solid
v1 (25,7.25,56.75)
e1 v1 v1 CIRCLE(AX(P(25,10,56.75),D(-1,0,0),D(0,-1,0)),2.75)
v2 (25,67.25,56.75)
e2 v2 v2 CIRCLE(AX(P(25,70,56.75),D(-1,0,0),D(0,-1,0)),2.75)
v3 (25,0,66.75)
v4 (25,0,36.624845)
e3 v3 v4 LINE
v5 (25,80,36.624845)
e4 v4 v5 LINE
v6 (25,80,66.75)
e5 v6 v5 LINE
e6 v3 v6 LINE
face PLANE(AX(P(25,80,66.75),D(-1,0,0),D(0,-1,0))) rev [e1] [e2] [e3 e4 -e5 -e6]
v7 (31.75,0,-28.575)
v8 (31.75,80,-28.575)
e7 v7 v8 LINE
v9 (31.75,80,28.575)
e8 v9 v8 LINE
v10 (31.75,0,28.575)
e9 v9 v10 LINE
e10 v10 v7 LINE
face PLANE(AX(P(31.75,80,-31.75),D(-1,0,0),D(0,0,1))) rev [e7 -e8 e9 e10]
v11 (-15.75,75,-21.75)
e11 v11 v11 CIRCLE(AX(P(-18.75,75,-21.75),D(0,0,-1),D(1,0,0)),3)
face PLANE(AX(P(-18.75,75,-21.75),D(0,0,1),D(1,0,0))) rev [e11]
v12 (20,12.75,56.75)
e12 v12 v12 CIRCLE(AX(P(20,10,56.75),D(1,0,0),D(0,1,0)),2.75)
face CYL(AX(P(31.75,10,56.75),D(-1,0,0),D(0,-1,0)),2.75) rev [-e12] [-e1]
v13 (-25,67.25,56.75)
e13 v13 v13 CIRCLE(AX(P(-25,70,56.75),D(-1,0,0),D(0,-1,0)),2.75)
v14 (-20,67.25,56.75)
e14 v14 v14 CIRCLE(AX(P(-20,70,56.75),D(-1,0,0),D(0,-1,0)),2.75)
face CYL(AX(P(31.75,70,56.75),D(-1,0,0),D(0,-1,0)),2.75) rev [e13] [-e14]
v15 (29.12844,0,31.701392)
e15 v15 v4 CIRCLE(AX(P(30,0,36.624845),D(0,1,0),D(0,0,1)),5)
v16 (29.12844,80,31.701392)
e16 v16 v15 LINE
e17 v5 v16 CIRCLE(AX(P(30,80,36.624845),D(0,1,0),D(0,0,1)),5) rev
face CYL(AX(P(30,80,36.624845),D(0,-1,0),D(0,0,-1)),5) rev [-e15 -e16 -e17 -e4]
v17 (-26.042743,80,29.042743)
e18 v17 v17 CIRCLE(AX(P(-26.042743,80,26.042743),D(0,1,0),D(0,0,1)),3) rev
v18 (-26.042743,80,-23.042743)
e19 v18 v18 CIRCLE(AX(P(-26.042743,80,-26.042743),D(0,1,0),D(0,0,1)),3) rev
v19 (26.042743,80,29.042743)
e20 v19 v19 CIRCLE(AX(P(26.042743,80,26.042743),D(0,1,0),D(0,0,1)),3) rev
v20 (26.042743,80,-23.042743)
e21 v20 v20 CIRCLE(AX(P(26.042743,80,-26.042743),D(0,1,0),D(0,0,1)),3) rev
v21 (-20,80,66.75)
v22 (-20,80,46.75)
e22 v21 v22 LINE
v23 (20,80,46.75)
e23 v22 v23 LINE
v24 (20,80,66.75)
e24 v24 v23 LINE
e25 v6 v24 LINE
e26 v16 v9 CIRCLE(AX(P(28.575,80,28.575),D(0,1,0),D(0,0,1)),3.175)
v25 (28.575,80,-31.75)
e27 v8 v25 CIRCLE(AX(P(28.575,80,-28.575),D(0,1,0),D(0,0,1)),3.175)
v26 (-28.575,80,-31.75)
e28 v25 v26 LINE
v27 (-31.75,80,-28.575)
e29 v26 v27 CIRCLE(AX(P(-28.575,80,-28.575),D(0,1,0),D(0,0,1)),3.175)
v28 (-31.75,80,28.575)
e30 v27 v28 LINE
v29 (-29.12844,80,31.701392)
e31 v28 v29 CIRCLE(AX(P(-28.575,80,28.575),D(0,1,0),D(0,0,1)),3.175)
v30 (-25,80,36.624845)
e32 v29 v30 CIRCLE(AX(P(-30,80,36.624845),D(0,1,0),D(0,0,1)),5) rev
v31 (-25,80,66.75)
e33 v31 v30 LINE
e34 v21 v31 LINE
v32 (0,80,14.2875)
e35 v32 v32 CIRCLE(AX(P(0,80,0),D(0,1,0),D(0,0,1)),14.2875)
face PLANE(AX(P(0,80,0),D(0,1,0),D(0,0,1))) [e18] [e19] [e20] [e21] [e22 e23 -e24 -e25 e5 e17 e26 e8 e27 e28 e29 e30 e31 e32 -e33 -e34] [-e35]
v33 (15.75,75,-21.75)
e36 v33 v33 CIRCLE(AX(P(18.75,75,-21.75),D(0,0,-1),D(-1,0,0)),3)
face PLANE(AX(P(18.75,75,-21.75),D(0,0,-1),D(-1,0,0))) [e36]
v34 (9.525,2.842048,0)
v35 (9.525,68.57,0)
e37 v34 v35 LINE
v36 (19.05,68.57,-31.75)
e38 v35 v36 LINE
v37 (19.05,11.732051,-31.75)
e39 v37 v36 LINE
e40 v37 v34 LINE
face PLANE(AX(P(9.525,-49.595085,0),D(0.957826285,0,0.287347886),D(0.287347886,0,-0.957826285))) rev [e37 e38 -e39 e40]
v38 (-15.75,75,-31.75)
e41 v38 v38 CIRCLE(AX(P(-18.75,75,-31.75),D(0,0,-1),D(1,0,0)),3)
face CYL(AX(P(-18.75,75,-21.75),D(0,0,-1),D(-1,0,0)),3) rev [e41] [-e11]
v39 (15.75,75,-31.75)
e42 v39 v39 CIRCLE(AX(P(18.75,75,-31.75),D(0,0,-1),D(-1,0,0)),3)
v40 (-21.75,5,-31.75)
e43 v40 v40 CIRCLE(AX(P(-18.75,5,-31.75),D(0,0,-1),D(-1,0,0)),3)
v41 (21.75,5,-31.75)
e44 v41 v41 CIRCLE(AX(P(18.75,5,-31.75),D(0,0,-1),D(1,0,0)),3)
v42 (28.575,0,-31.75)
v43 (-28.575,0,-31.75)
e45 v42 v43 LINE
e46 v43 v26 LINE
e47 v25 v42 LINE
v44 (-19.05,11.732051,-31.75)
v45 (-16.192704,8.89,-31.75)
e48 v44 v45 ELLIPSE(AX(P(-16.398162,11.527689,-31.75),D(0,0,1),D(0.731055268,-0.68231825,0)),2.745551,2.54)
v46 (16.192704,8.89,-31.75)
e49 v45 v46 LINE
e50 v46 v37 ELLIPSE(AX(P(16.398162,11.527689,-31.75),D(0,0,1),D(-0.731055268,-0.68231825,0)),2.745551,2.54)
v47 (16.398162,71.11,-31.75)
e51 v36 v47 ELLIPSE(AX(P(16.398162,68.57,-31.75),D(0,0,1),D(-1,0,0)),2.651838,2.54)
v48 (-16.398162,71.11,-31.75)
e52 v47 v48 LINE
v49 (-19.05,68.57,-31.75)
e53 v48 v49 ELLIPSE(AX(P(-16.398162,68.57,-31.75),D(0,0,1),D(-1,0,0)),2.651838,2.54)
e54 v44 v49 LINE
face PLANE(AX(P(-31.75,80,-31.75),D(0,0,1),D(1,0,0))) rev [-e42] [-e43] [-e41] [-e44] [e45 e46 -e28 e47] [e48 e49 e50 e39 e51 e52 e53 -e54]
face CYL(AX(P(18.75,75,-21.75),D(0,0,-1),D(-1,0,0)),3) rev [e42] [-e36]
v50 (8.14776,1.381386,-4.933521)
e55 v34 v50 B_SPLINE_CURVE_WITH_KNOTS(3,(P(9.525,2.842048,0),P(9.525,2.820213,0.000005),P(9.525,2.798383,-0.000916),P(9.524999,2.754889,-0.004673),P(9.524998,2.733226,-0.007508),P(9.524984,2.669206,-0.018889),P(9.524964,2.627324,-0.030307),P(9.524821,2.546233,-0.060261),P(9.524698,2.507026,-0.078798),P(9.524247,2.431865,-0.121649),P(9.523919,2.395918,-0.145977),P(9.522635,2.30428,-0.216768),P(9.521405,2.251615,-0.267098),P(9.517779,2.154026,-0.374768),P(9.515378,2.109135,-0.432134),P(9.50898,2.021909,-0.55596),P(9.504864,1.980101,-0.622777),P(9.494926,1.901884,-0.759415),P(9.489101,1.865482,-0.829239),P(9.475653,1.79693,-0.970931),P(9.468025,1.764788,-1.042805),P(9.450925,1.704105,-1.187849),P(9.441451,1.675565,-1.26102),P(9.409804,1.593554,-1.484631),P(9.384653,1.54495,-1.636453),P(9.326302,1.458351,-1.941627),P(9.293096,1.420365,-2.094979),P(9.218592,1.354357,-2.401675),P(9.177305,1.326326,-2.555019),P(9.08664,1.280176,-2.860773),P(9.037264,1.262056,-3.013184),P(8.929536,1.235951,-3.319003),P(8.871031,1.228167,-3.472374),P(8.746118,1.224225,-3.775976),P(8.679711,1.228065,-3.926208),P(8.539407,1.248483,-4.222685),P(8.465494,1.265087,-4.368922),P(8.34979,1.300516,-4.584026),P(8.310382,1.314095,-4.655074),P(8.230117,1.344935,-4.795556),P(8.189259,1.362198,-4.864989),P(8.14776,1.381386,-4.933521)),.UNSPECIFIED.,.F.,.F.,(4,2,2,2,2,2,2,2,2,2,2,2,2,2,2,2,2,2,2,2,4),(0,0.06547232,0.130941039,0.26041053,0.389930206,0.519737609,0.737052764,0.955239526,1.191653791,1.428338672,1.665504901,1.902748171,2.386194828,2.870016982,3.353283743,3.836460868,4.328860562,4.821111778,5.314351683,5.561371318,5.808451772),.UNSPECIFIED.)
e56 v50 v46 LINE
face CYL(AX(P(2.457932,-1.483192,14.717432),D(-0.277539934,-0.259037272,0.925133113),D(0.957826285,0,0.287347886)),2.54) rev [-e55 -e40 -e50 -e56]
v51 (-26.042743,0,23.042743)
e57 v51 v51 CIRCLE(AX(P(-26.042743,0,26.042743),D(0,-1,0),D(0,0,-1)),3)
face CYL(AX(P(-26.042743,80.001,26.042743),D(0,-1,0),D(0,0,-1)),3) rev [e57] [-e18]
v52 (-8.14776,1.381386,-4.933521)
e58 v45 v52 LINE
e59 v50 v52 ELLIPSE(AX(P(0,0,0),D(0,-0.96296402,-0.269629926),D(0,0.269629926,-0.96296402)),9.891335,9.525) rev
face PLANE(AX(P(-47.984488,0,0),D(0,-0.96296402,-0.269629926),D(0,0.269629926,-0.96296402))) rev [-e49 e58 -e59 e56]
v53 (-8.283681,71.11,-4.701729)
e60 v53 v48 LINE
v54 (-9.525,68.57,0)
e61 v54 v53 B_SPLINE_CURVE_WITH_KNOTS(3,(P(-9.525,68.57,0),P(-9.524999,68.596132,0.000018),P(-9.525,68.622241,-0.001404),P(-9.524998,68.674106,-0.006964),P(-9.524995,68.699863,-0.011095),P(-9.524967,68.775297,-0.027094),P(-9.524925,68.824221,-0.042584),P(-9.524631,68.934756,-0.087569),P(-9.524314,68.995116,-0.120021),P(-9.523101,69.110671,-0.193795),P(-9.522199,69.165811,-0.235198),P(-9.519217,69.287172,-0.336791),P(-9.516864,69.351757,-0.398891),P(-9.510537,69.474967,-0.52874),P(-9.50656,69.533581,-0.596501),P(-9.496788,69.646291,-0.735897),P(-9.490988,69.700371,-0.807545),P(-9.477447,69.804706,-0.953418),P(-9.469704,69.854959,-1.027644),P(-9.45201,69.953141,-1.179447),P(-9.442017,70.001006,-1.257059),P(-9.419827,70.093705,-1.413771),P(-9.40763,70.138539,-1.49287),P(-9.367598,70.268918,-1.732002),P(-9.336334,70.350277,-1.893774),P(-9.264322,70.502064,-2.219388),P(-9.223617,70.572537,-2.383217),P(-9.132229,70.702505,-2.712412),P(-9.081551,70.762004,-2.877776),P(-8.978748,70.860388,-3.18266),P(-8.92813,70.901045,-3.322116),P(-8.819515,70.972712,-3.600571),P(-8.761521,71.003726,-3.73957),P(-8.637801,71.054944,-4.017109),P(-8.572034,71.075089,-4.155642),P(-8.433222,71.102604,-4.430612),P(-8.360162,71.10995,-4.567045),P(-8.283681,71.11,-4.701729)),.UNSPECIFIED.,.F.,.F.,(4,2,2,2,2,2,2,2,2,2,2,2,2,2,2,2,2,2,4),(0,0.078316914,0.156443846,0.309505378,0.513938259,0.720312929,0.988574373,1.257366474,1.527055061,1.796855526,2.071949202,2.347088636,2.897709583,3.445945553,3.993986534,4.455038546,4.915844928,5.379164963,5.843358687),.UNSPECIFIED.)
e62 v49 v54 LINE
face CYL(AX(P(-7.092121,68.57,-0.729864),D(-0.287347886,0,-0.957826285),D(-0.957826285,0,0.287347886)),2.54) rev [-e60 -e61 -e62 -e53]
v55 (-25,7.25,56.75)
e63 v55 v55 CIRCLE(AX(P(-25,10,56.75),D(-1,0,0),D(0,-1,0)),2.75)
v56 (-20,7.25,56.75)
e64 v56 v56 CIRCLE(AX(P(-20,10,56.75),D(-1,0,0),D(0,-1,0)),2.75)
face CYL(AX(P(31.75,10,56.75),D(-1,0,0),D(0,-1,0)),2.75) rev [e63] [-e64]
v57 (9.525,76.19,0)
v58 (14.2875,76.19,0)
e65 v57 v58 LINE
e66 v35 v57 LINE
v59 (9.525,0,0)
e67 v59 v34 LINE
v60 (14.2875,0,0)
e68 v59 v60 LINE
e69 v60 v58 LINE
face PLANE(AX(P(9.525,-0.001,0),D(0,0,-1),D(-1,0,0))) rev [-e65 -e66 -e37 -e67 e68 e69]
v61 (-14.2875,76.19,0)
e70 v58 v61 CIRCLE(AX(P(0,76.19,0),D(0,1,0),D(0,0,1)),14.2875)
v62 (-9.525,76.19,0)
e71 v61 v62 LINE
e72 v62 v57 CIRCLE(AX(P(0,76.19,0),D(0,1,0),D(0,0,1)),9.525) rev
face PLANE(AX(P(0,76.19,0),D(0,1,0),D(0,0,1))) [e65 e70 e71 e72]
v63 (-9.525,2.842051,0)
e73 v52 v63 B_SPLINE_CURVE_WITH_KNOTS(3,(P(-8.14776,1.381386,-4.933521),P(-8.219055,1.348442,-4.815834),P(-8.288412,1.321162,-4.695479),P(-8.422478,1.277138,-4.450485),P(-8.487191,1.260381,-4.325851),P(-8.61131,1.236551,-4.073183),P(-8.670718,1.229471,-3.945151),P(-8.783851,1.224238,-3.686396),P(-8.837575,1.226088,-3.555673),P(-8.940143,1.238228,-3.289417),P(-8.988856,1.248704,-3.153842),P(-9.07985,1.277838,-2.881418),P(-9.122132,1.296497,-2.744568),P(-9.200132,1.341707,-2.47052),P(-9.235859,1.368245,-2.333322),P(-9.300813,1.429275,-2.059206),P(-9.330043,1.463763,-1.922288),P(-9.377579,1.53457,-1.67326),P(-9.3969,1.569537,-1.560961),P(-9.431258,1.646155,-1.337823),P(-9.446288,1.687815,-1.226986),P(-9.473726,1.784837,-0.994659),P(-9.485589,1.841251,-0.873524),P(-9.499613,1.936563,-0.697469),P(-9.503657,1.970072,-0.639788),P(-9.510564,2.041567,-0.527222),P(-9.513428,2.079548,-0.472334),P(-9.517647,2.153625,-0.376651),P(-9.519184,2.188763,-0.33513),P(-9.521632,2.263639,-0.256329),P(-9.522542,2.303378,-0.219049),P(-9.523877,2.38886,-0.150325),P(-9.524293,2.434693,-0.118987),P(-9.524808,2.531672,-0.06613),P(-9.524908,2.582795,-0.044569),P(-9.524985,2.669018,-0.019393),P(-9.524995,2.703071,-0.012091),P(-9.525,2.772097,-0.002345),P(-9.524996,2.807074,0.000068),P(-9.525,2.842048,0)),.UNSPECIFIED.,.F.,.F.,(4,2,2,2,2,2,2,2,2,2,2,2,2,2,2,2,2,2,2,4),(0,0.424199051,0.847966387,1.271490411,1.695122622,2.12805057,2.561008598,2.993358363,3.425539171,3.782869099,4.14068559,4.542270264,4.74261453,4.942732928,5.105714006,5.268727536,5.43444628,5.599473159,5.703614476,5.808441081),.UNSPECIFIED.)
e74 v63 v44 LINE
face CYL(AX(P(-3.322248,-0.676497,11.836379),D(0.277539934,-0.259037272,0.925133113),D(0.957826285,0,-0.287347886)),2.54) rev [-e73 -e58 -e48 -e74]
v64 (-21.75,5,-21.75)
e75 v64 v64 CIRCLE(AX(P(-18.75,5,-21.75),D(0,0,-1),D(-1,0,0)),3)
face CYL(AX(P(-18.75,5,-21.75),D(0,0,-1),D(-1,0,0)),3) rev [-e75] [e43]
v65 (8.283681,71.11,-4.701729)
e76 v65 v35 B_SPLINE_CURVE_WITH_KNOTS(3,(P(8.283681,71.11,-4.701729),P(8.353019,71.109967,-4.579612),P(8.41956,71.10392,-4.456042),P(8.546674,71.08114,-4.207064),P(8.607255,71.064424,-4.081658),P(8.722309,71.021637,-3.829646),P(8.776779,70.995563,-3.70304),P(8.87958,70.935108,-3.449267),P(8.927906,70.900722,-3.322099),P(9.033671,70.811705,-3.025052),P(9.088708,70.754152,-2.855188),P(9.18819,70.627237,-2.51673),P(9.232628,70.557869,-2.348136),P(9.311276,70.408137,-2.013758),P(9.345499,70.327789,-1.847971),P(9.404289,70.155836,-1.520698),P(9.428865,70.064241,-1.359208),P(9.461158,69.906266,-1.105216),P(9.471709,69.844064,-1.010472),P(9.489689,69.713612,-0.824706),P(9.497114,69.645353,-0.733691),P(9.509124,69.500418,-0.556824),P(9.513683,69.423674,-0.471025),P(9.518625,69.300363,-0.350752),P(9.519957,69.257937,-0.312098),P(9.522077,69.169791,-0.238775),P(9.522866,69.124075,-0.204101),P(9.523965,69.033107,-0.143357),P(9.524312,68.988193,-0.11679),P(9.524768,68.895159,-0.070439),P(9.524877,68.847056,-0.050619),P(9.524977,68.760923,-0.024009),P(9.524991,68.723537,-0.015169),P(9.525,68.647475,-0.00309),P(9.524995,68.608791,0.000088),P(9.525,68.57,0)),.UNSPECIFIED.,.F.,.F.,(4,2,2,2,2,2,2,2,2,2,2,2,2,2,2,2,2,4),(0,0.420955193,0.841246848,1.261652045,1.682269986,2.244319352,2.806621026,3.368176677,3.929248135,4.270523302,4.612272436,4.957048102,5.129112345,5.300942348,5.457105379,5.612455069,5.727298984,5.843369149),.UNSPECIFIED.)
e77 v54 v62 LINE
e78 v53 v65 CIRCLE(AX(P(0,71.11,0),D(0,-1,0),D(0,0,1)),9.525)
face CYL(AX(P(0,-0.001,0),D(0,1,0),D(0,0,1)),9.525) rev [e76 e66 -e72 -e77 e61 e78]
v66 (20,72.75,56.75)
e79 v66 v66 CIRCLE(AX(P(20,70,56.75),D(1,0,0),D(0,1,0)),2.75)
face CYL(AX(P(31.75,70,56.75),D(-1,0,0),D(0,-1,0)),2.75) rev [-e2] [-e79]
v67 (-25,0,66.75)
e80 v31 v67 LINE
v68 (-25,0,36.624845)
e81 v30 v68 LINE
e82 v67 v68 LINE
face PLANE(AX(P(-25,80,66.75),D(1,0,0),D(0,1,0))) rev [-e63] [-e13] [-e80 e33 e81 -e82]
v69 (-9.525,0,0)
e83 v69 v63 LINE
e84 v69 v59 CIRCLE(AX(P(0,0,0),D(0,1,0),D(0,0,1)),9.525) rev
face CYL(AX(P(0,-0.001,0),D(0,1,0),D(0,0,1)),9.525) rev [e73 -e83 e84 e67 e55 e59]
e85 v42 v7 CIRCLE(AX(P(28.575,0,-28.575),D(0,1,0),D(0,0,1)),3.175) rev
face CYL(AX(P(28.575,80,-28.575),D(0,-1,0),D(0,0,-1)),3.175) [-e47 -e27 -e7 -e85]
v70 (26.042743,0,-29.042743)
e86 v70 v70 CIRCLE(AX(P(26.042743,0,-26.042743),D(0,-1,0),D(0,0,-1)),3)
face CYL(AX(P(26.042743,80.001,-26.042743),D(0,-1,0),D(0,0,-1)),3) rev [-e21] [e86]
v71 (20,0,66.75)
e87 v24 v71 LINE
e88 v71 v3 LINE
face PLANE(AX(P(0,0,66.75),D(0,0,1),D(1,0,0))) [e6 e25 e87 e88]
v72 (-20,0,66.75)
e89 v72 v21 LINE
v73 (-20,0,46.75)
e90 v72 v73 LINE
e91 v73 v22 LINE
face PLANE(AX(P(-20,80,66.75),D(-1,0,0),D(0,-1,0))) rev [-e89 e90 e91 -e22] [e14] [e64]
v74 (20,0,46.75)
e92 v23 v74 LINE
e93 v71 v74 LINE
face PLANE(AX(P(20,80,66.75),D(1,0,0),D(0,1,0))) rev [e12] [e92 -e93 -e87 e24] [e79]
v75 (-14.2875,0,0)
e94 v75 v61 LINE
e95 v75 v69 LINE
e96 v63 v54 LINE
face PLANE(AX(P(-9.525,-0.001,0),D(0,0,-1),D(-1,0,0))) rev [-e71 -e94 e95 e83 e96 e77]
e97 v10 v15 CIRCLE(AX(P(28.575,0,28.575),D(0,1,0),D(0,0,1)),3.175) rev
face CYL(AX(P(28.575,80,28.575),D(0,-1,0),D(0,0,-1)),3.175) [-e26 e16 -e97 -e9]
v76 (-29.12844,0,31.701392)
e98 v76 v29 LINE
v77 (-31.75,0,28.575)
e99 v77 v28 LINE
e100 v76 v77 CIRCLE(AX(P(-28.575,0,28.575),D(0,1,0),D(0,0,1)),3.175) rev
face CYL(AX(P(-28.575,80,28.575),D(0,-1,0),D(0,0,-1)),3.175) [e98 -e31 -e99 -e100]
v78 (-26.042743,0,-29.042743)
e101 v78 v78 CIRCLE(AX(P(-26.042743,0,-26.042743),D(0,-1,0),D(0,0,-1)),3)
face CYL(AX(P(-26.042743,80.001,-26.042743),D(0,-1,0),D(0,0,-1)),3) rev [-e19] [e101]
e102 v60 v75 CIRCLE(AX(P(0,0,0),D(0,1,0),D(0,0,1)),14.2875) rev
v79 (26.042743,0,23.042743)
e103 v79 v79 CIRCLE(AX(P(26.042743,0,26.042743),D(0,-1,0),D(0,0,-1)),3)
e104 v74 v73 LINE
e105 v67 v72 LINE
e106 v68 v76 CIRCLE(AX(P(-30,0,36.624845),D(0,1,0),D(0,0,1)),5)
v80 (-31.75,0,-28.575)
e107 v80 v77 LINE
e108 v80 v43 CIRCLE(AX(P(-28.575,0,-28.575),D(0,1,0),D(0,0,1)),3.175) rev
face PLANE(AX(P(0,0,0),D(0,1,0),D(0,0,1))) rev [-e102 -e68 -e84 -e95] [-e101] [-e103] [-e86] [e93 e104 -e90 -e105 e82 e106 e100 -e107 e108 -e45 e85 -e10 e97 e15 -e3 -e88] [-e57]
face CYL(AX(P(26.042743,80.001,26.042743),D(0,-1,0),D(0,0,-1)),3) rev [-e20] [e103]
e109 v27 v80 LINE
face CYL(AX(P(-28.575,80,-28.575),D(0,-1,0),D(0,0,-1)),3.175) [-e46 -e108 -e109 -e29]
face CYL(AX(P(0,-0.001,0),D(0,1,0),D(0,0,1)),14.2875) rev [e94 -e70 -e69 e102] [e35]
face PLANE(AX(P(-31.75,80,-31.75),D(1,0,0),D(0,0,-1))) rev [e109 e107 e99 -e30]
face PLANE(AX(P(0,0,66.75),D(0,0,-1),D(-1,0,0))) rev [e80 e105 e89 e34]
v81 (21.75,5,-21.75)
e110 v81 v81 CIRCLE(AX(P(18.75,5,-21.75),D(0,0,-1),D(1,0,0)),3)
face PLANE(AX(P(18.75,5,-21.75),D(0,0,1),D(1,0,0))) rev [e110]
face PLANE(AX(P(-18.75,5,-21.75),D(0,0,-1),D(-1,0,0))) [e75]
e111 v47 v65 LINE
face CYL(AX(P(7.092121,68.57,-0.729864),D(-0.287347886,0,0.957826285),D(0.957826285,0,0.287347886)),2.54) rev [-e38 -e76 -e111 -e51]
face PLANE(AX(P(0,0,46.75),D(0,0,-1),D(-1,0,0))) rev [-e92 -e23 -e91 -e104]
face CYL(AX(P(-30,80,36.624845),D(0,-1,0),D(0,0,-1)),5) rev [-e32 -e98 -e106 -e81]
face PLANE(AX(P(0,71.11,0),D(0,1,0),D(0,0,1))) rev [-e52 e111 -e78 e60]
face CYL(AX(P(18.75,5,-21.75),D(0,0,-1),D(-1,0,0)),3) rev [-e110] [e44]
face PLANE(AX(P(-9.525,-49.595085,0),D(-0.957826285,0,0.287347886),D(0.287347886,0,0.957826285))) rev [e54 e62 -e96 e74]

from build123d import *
from build123d.topology import SkipClean

# Parameters (mm, degrees)
SKETCH2_W                      = 63.5
SKETCH2_H                      = 63.5
BOSS_EXTRUDE1_DEPTH            = 80
CUT_EXTRUDE1_REACH             = 93.739
SKETCH4_R                      = 14.2875
CUT_EXTRUDE2_DEPTH             = 3.81
CUT_EXTRUDE3_DEPTH             = 62.22
CUT_EXTRUDE4_REACH             = 93.739
CUT_EXTRUDE4_DIRECTION_2_REACH = 93.739
FILLET2_R                      = 2.54
SKETCH9_W                      = 5
SKETCH9_H                      = 80
BOSS_EXTRUDE2_DEPTH            = 35
SKETCH10_R                     = 2.75
CUT_EXTRUDE6_DEPTH             = 119.642846392
CUT_EXTRUDE7_REACH             = 110.92
SKETCH11_R                     = 3
SKETCH12_W                     = 40
SKETCH12_H                     = 80
BOSS_EXTRUDE3_DEPTH            = 15
SKETCH13_R                     = 3
CUT_EXTRUDE8_DEPTH             = 10
FILLET3_R                      = 3.175
FILLET4_DEPTH                  = 80


with BuildPart() as part:
    # Sketch2 → Boss-Extrude1 (new body)
    with BuildSketch(Plane(origin=(0, 0, 0), x_dir=(1, 0, 0), z_dir=(0, 1, 0))):
        Rectangle(SKETCH2_W, SKETCH2_H)
    extrude(amount=BOSS_EXTRUDE1_DEPTH)

    # Sketch3 → Cut-Extrude1 (cut, up to next)
    with BuildSketch(Plane(origin=(0, 80, 0), x_dir=(1, 0, 0), z_dir=(0, 1, 0)), mode=Mode.PRIVATE) as cut_extrude1_sk1:
        with BuildLine():
            Line((9.525, 0), (14.2875, 0))
            ThreePointArc((14.2875, 0), (0, -14.2875), (-14.2875, 0))
            Line((-14.2875, 0), (-9.525, 0))
            ThreePointArc((-9.525, 0), (0, 9.525), (9.525, 0))
        make_face()
    cut_extrude1_tool1 = extrude(cut_extrude1_sk1.sketch, amount=-CUT_EXTRUDE1_REACH, mode=Mode.PRIVATE) & part.part
    add(cut_extrude1_tool1.solids().sort_by_distance((0, 80, 2.954161))[0], mode=Mode.SUBTRACT)

    # Sketch4 → Cut-Extrude2 (cut)
    with BuildSketch(Plane(origin=(0, 80, 0), x_dir=(1, 0, 0), z_dir=(0, 1, 0))):
        with Locations(Location((0, 0, 0), (0, 0, 270))):
            Circle(SKETCH4_R)
    extrude(amount=-CUT_EXTRUDE2_DEPTH, mode=Mode.SUBTRACT)

    # Sketch6 → Cut-Extrude3 (cut)
    with BuildSketch(Plane(origin=(0, 71.11, 0), x_dir=(1, 0, 0), z_dir=(0, 1, 0))):
        with BuildLine():
            Line((9.525, 0), (19.05, 31.75))
            Line((19.05, 31.75), (-19.05, 31.75))
            Line((-19.05, 31.75), (-9.525, 0))
            ThreePointArc((-9.525, 0), (0, 9.525), (9.525, 0))
        make_face()
    extrude(amount=-CUT_EXTRUDE3_DEPTH, mode=Mode.SUBTRACT)

    # Cut-Extrude4: up to this plane
    with SkipClean():  # the faces are left unmerged after this step: merging them gives an invalid solid
        cut_extrude4_end = Plane(origin=(-9.525, -49.595085442, 0), z_dir=(-0.9578262852211514, 0, 0.2873478855663456))
        # Sketch7 → Cut-Extrude4 (cut, up to the surface)
        with BuildSketch(Plane(origin=(0, 0, 0), x_dir=(0, 0, -1), z_dir=(1, 0, 0)), mode=Mode.PRIVATE) as cut_extrude4_sk1:
            Polygon((0, 8.89), (31.75, 8.89), (0, 0), align=None)
        cut_extrude4_tool1 = split(extrude(cut_extrude4_sk1.sketch, amount=-CUT_EXTRUDE4_REACH, mode=Mode.PRIVATE), bisect_by=cut_extrude4_end, keep=Keep.BOTH, mode=Mode.PRIVATE)
        add(cut_extrude4_tool1.solids().sort_by_distance((0, 5.926667, -10.583333))[0], mode=Mode.SUBTRACT)

    # Cut-Extrude4 direction 2: up to this plane
    cut_extrude4_direction_2_end = Plane(origin=(9.525, -49.595085442, 0), z_dir=(0.9578262852211514, 0, 0.2873478855663456))
    # Sketch7 → Cut-Extrude4 direction 2 (cut, up to the surface)
    with BuildSketch(Plane(origin=(0, 0, 0), x_dir=(0, 0, -1), z_dir=(1, 0, 0)), mode=Mode.PRIVATE) as cut_extrude4_direction_2_sk1:
        Polygon((0, 8.89), (31.75, 8.89), (0, 0), align=None)
    cut_extrude4_direction_2_tool1 = split(extrude(cut_extrude4_direction_2_sk1.sketch, amount=CUT_EXTRUDE4_DIRECTION_2_REACH, mode=Mode.PRIVATE), bisect_by=cut_extrude4_direction_2_end, keep=Keep.BOTH, mode=Mode.PRIVATE)
    add(cut_extrude4_direction_2_tool1.solids().sort_by_distance((0, 5.926667, -10.583333))[0], mode=Mode.SUBTRACT)

    # Fillet2
    # the kernel refuses this fillet: 2.54 mm, written as the material it adds along each edge
    with BuildSketch(Plane(origin=(7.700340927, 71.11, 6.082196911), x_dir=(-0.9578262852211513, 0, -0.2873478855663455), z_dir=(0.28734788556634555, 0, -0.9578262852211513))) as fillet2_piece_1_section:
        with BuildLine():
            CenterArc((FILLET2_R, -FILLET2_R), FILLET2_R, 90, 90)
            Line((0, -FILLET2_R), (0, 0))
            Line((0, 0), (FILLET2_R, 0))
        make_face()
    fillet2_piece_1 = extrude(amount=45.847973166, mode=Mode.PRIVATE)
    fillet2_piece_1 = split(fillet2_piece_1, bisect_by=Plane(origin=(7.700340927, 71.11, -31.75), z_dir=(0, 0, 1)), keep=Keep.TOP, mode=Mode.PRIVATE)
    fillet2_piece_1 = fillet2_piece_1 - Plane(origin=(0, 71.11, 0), x_dir=(-1, 0, 0), z_dir=(0, 1, 0)) * Cylinder(9.525, 102, mode=Mode.PRIVATE)
    fillet2_piece_1 = split(fillet2_piece_1, bisect_by=Plane(origin=(7.700340927, 71.11, 0), z_dir=(0, 0, -1)), keep=Keep.TOP, mode=Mode.PRIVATE)
    add(fillet2_piece_1)
    with BuildSketch(Plane(origin=(-20.874659073, 71.11, -37.832196911), x_dir=(0, -1, 0), z_dir=(0.28734788556634555, 0, 0.9578262852211513))) as fillet2_piece_2_section:
        with BuildLine():
            CenterArc((FILLET2_R, FILLET2_R), FILLET2_R, 180, 90)
            Line((0, FILLET2_R), (0, 0))
            Line((0, 0), (FILLET2_R, 0))
        make_face()
    fillet2_piece_2 = extrude(amount=45.847973166, mode=Mode.PRIVATE)
    fillet2_piece_2 = split(fillet2_piece_2, bisect_by=Plane(origin=(-20.874659073, 71.11, -31.75), z_dir=(0, 0, 1)), keep=Keep.TOP, mode=Mode.PRIVATE)
    fillet2_piece_2 = split(fillet2_piece_2, bisect_by=Plane(origin=(-20.874659073, 71.11, 0), z_dir=(0, 0, -1)), keep=Keep.TOP, mode=Mode.PRIVATE)
    fillet2_piece_2 = fillet2_piece_2 - Plane(origin=(0, 71.11, 0), x_dir=(-1, 0, 0), z_dir=(0, 1, 0)) * Cylinder(9.525, 102, mode=Mode.PRIVATE)
    add(fillet2_piece_2)
    with BuildSketch(Plane(origin=(-20.954648619, 10.667672044, -38.098828729), x_dir=(0.9607141016314922, 0.07483307171461691, -0.2672609704093551), z_dir=(0.2775399339309484, -0.2590372716688848, 0.9251331131031606))) as fillet2_piece_3_section:
        with BuildLine():
            CenterArc((FILLET2_R * 1.08072615035, FILLET2_R), FILLET2_R, 175.556407911, 94.443592089)
            Line((FILLET2_R * 0.0837320564804, FILLET2_R * 1.07747758898), (0, 0))
            Line((0, 0), (FILLET2_R * 1.08072615035, 0))
        make_face()
    fillet2_piece_3 = extrude(amount=52.848435405, mode=Mode.PRIVATE)
    fillet2_piece_3 = split(fillet2_piece_3, bisect_by=Plane(origin=(-20.954648619, 10.667672044, -31.75), z_dir=(0, 0, 1)), keep=Keep.TOP, mode=Mode.PRIVATE)
    fillet2_piece_3 = fillet2_piece_3 - Plane(origin=(0, 10.667672044, 0), x_dir=(-1, 0, 0), z_dir=(0, 1, 0)) * Cylinder(9.525, 117, mode=Mode.PRIVATE)
    fillet2_piece_3 = split(fillet2_piece_3, bisect_by=Plane(origin=(-20.954648619, 10.667672044, 0), z_dir=(0, 0, -1)), keep=Keep.TOP, mode=Mode.PRIVATE)
    add(fillet2_piece_3)
    with BuildSketch(Plane(origin=(20.954648619, 10.667672044, -38.098828729), x_dir=(-0.9607141016314922, 0.07483307171461691, -0.2672609704093551), z_dir=(-0.2775399339309484, -0.2590372716688848, 0.9251331131031606))) as fillet2_piece_4_section:
        with BuildLine():
            CenterArc((FILLET2_R * 1.08072615035, -FILLET2_R), FILLET2_R, 90, 94.443592089)
            Line((FILLET2_R * 0.0837320564804, -FILLET2_R * 1.07747758898), (0, 0))
            Line((0, 0), (FILLET2_R * 1.08072615035, 0))
        make_face()
    fillet2_piece_4 = extrude(amount=52.848435405, mode=Mode.PRIVATE)
    fillet2_piece_4 = split(fillet2_piece_4, bisect_by=Plane(origin=(20.954648619, 10.667672044, -31.75), z_dir=(0, 0, 1)), keep=Keep.TOP, mode=Mode.PRIVATE)
    fillet2_piece_4 = fillet2_piece_4 - Plane(origin=(0, 10.667672044, 0), x_dir=(-1, 0, 0), z_dir=(0, 1, 0)) * Cylinder(9.525, 117, mode=Mode.PRIVATE)
    fillet2_piece_4 = split(fillet2_piece_4, bisect_by=Plane(origin=(20.954648619, 10.667672044, 0), z_dir=(0, 0, -1)), keep=Keep.TOP, mode=Mode.PRIVATE)
    add(fillet2_piece_4)

    # Sketch9 → Boss-Extrude2 (add)
    with BuildSketch(Plane.XY.offset(31.75)):
        with Locations((-22.5, 40)):
            Rectangle(SKETCH9_W, SKETCH9_H)
        with Locations((22.5, 40)):
            Rectangle(SKETCH9_W, SKETCH9_H)
    extrude(amount=BOSS_EXTRUDE2_DEPTH)

    # Sketch10 → Cut-Extrude6 (cut, through all)
    with BuildSketch(Plane.ZY.offset(25)):
        with Locations(Location((56.75, 70, 0), (0, 0, 270))):
            Circle(SKETCH10_R)
        with Locations(Location((56.75, 10, 0), (0, 0, 270))):
            Circle(SKETCH10_R)
    extrude(amount=-CUT_EXTRUDE6_DEPTH, mode=Mode.SUBTRACT)

    # Sketch11 → Cut-Extrude7 (cut, up to next)
    with BuildSketch(Plane.XZ, mode=Mode.PRIVATE) as cut_extrude7_sk1:
        with Locations(Location((26.042742751, -26.042742751, 0), (0, 0, 270))):
            Circle(SKETCH11_R)
    cut_extrude7_tool1 = extrude(cut_extrude7_sk1.sketch, amount=-CUT_EXTRUDE7_REACH, mode=Mode.PRIVATE) & part.part
    # Sketch11 → Cut-Extrude7 (cut, up to next)
    with BuildSketch(Plane.XZ, mode=Mode.PRIVATE) as cut_extrude7_sk2:
        with Locations(Location((26.042742751, 26.042742751, 0), (0, 0, 270))):
            Circle(SKETCH11_R)
    cut_extrude7_tool2 = extrude(cut_extrude7_sk2.sketch, amount=-CUT_EXTRUDE7_REACH, mode=Mode.PRIVATE) & part.part
    # Sketch11 → Cut-Extrude7 (cut, up to next)
    with BuildSketch(Plane.XZ, mode=Mode.PRIVATE) as cut_extrude7_sk3:
        with Locations(Location((-26.042742751, -26.042742751, 0), (0, 0, 270))):
            Circle(SKETCH11_R)
    cut_extrude7_tool3 = extrude(cut_extrude7_sk3.sketch, amount=-CUT_EXTRUDE7_REACH, mode=Mode.PRIVATE) & part.part
    # Sketch11 → Cut-Extrude7 (cut, up to next)
    with BuildSketch(Plane.XZ, mode=Mode.PRIVATE) as cut_extrude7_sk4:
        with Locations(Location((-26.042742751, 26.042742751, 0), (0, 0, 270))):
            Circle(SKETCH11_R)
    cut_extrude7_tool4 = extrude(cut_extrude7_sk4.sketch, amount=-CUT_EXTRUDE7_REACH, mode=Mode.PRIVATE) & part.part
    add(cut_extrude7_tool1.solids().sort_by_distance((26.042743, 0, -26.042743))[0], mode=Mode.SUBTRACT)
    add(cut_extrude7_tool2.solids().sort_by_distance((26.042743, 0, 26.042743))[0], mode=Mode.SUBTRACT)
    add(cut_extrude7_tool3.solids().sort_by_distance((-26.042743, 0, -26.042743))[0], mode=Mode.SUBTRACT)
    add(cut_extrude7_tool4.solids().sort_by_distance((-26.042743, 0, 26.042743))[0], mode=Mode.SUBTRACT)

    # Sketch12 → Boss-Extrude3 (add)
    with BuildSketch(Plane.XY.offset(31.75)):
        with Locations((0, 40)):
            Rectangle(SKETCH12_W, SKETCH12_H)
    extrude(amount=BOSS_EXTRUDE3_DEPTH)

    # Sketch13 → Cut-Extrude8 (cut)
    with BuildSketch(Plane(origin=(0, 0, -31.75), x_dir=(-1, 0, 0), z_dir=(0, 0, -1))):
        with Locations((-18.75, 75)):
            Circle(SKETCH13_R)
        with Locations(Location((18.75, 75, 0), (0, 0, 180))):
            Circle(SKETCH13_R)
        with Locations((18.75, 5)):
            Circle(SKETCH13_R)
        with Locations(Location((-18.75, 5, 0), (0, 0, 180))):
            Circle(SKETCH13_R)
    extrude(amount=-CUT_EXTRUDE8_DEPTH, mode=Mode.SUBTRACT)

    # Fillet3
    fillet3_edges = [part.edges().sort_by_distance(p)[0] for p in [
        (31.75, 40, 31.75),
        (-31.75, 40, 31.75),
        (-31.75, 40, -31.75),
        (31.75, 40, -31.75),
    ]]
    fillet(fillet3_edges, radius=FILLET3_R)

    # Fillet4: read off the stored shape, not the designer's step
    # Fillet4 outline → Fillet4 (add)
    with BuildSketch(Plane(origin=(0, 0, 0), x_dir=(1, 0, 0), z_dir=(0, 1, 0))):
        with BuildLine():
            Line((25, -31.75), (25, -36.624844719))
            ThreePointArc((25, -36.624844719), (26.168694859, -33.412197692), (29.128440367, -31.701392291))
            ThreePointArc((29.128440367, -31.701392291), (28.852785416, -31.737824728), (28.575, -31.75))
            Line((28.575, -31.75), (25, -31.75))
        make_face()
        with BuildLine():
            ThreePointArc((-28.575, -31.75), (-28.852785416, -31.737824728), (-29.128440367, -31.701392291))
            ThreePointArc((-29.128440367, -31.701392291), (-26.168694859, -33.412197692), (-25, -36.624844719))
            Line((-25, -36.624844719), (-25, -31.75))
            Line((-25, -31.75), (-28.575, -31.75))
        make_face()
    extrude(amount=FILLET4_DEPTH)


solid = part.part
